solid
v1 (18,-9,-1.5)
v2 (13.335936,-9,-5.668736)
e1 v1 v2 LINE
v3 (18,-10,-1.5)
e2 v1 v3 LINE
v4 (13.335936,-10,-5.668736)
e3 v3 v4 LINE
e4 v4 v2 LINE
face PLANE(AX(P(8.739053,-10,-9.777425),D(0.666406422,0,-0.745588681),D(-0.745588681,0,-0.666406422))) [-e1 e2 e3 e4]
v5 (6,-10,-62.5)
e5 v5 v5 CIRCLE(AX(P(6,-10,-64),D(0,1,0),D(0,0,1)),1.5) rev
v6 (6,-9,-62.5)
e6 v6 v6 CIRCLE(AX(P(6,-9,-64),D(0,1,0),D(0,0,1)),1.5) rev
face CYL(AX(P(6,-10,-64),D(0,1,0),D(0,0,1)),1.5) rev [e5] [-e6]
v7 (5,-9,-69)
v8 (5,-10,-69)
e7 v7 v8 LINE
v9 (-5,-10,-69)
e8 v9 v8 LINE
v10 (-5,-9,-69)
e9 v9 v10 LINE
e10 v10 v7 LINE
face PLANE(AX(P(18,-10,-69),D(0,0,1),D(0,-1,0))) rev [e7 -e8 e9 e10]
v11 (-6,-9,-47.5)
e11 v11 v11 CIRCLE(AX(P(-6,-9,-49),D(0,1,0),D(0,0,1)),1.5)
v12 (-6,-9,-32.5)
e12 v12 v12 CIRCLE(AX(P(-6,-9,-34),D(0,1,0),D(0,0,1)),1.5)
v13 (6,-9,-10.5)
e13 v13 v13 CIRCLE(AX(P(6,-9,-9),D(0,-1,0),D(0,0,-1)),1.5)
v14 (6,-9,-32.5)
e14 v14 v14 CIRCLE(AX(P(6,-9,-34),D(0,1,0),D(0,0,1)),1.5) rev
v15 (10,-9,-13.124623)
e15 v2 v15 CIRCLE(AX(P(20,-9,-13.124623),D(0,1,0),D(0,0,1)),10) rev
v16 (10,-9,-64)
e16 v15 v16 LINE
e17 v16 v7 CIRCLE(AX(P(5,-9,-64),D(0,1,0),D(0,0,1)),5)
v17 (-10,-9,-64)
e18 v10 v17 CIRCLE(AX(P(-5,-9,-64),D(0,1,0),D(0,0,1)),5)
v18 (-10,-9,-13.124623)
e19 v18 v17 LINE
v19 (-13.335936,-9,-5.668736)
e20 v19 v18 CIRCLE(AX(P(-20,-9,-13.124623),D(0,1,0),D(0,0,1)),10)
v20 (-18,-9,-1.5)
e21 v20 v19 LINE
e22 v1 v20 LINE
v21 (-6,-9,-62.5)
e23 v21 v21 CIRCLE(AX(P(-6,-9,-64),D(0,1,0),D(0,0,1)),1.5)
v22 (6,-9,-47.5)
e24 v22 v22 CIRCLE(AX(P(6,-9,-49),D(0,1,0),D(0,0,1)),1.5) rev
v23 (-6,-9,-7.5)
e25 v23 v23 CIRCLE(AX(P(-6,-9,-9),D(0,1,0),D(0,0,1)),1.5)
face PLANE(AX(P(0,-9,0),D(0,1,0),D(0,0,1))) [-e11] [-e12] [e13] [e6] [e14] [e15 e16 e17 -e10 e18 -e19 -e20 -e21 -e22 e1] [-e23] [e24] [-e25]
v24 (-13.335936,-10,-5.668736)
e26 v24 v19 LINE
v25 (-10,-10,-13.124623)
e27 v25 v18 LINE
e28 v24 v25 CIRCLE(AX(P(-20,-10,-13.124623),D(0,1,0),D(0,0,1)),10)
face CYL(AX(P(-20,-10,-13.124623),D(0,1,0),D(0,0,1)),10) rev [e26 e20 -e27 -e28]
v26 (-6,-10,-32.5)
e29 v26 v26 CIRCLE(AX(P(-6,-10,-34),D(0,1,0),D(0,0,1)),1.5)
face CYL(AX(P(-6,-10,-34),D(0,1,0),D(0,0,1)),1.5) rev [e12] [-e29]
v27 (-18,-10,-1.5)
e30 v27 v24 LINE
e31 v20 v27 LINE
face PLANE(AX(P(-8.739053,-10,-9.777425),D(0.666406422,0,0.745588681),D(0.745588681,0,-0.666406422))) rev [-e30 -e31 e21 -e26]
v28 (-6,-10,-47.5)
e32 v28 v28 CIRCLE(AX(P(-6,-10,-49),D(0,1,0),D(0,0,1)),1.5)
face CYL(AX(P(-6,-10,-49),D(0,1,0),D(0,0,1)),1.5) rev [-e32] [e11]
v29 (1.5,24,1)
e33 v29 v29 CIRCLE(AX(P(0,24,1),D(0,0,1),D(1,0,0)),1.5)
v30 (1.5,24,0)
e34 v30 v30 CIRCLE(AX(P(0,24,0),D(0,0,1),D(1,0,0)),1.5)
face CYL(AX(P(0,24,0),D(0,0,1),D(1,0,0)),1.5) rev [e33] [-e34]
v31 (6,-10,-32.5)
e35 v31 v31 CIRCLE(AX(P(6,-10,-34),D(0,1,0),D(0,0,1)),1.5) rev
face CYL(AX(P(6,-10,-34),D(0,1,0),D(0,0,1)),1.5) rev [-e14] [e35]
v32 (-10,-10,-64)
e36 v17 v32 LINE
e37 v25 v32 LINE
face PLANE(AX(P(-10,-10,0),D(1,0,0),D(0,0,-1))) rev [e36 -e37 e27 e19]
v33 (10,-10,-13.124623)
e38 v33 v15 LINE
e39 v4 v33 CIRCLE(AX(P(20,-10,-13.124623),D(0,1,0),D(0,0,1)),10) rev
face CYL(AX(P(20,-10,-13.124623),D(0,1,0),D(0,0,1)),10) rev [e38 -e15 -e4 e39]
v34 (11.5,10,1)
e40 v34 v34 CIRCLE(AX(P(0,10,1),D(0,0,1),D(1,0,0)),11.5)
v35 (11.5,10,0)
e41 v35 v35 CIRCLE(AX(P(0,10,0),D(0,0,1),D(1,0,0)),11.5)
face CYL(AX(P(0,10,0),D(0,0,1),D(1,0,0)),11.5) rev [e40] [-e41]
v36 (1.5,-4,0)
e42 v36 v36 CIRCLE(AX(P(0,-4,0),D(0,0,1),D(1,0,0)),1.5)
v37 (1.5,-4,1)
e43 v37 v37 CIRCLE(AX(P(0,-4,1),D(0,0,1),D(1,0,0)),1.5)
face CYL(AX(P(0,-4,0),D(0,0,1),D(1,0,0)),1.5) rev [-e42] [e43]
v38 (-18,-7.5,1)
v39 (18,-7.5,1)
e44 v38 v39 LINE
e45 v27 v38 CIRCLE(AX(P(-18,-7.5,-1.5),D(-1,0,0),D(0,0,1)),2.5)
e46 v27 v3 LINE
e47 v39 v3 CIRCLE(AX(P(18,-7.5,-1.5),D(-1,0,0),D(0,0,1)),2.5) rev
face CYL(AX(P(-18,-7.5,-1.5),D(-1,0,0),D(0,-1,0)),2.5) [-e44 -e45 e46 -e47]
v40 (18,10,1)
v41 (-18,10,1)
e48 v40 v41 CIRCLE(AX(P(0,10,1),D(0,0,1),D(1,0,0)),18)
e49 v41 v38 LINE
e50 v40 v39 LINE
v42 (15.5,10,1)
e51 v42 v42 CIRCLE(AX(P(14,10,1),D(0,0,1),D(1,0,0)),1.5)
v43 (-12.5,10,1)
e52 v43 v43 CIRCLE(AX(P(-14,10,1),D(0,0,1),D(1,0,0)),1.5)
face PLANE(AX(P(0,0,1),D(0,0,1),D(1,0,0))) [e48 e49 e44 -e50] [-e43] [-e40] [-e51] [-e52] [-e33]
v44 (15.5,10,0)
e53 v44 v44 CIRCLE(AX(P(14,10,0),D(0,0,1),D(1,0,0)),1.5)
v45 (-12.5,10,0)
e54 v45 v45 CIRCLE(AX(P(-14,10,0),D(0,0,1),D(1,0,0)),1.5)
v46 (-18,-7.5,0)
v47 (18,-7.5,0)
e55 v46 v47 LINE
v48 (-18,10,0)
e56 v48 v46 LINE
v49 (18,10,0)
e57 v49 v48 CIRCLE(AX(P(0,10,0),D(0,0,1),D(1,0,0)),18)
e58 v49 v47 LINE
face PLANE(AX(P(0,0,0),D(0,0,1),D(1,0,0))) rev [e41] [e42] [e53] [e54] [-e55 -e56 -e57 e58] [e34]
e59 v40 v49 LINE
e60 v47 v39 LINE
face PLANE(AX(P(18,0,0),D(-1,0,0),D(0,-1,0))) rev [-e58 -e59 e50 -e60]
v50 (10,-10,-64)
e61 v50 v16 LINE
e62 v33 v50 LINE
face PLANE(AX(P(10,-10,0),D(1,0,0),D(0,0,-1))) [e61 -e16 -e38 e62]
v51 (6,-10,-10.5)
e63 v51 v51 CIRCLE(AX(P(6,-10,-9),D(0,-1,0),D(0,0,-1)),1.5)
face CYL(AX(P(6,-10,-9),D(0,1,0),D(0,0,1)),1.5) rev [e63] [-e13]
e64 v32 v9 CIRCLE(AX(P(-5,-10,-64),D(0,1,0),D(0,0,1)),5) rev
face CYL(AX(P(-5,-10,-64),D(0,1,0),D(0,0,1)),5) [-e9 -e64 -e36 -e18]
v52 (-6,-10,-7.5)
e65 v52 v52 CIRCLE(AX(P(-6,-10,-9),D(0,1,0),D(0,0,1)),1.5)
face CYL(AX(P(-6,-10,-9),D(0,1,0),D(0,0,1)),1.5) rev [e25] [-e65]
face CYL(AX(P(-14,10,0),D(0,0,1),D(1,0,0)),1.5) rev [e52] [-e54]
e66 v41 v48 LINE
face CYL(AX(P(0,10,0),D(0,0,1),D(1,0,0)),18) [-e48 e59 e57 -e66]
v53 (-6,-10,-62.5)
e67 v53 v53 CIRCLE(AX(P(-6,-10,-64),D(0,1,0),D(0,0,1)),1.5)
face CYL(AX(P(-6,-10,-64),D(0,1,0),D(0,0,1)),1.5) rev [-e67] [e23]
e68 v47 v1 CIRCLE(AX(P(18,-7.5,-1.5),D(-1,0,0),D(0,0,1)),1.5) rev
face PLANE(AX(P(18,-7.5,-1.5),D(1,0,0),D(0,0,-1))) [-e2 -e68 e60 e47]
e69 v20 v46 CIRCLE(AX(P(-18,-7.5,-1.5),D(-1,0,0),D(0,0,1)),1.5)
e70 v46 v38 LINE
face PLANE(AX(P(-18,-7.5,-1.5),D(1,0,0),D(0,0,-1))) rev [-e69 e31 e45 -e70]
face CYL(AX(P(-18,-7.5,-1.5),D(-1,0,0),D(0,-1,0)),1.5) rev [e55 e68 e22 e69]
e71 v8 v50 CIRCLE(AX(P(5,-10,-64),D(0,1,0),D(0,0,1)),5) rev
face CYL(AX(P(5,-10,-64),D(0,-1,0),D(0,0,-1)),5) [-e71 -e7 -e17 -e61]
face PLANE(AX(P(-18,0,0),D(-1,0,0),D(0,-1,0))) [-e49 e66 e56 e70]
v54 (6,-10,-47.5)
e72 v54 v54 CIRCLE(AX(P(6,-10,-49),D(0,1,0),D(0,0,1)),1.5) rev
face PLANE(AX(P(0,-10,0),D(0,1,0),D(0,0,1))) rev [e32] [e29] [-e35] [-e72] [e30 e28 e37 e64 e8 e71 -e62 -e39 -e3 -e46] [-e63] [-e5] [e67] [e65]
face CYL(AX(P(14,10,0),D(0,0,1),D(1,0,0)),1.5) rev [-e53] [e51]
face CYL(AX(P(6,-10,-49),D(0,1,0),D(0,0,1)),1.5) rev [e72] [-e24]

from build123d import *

# Parameters (mm, degrees)
BOSS_EXTRUDE1_DEPTH          = 1
EDGE_FLANGE1_STRIP_W         = 7
EDGE_FLANGE1_STRIP_H         = 1
EDGE_FLANGE1_STRIP_CUT_DEPTH = 36
EDGE_FLANGE1_DEPTH           = 36
SKETCH12_R                   = 1.5
CUT_EXTRUDE2_DEPTH           = 1
FILLET1_R                    = 5


# Sheet-metal steps are written as plain solids
with BuildPart() as part:
    # Sketch1 → Boss-Extrude1 (new body)
    with BuildSketch(Plane.XY):
        with BuildLine():
            Line((11.5, 10), (12.5, 10))
            ThreePointArc((12.5, 10), (12.911299923, 11.031858587), (13.919642857, 11.49784603))
            ThreePointArc((13.919642857, 11.49784603), (9.899494937, 19.899494937), (1.49784603, 23.919642857))
            ThreePointArc((1.49784603, 23.919642857), (0, 22.5), (-1.49784603, 23.919642857))
            ThreePointArc((-1.49784603, 23.919642857), (-9.899494937, 19.899494937), (-13.919642857, 11.49784603))
            ThreePointArc((-13.919642857, 11.49784603), (-12.911299923, 11.031858587), (-12.5, 10))
            Line((-12.5, 10), (-11.5, 10))
            ThreePointArc((-11.5, 10), (0, 21.5), (11.5, 10))
        make_face()
        with BuildLine():
            ThreePointArc((13.919642857, 11.49784603), (15.031858587, 11.088700077), (15.5, 10))
            Line((15.5, 10), (18, 10))
            ThreePointArc((18, 10), (0, 28), (-18, 10))
            Line((-18, 10), (-15.5, 10))
            ThreePointArc((-15.5, 10), (-15.031858587, 11.088700077), (-13.919642857, 11.49784603))
            ThreePointArc((-13.919642857, 11.49784603), (-9.899494937, 19.899494937), (-1.49784603, 23.919642857))
            ThreePointArc((-1.49784603, 23.919642857), (-0.040193003, 25.499461411), (1.5, 24))
            ThreePointArc((1.5, 24), (1.499461411, 23.959806997), (1.49784603, 23.919642857))
            ThreePointArc((1.49784603, 23.919642857), (9.899494937, 19.899494937), (13.919642857, 11.49784603))
        make_face()
        with BuildLine():
            ThreePointArc((13.919642857, 8.50215397), (12.911299923, 8.968141413), (12.5, 10))
            Line((12.5, 10), (11.5, 10))
            ThreePointArc((11.5, 10), (0, -1.5), (-11.5, 10))
            Line((-11.5, 10), (-12.5, 10))
            ThreePointArc((-12.5, 10), (-12.911299923, 8.968141413), (-13.919642857, 8.50215397))
            ThreePointArc((-13.919642857, 8.50215397), (-9.899494937, 0.100505063), (-1.49784603, -3.919642857))
            ThreePointArc((-1.49784603, -3.919642857), (0, -2.5), (1.49784603, -3.919642857))
            ThreePointArc((1.49784603, -3.919642857), (9.899494937, 0.100505063), (13.919642857, 8.50215397))
        make_face()
        with BuildLine():
            Line((18, 10), (15.5, 10))
            ThreePointArc((15.5, 10), (15.031858587, 8.911299923), (13.919642857, 8.50215397))
            ThreePointArc((13.919642857, 8.50215397), (9.899494937, 0.100505063), (1.49784603, -3.919642857))
            ThreePointArc((1.49784603, -3.919642857), (1.499461411, -3.959806997), (1.5, -4))
            ThreePointArc((1.5, -4), (-0.040193003, -5.499461411), (-1.49784603, -3.919642857))
            ThreePointArc((-1.49784603, -3.919642857), (-9.899494937, 0.100505063), (-13.919642857, 8.50215397))
            ThreePointArc((-13.919642857, 8.50215397), (-15.031858587, 8.911299923), (-15.5, 10))
            Line((-15.5, 10), (-18, 10))
            ThreePointArc((-18, 10), (0, -8), (18, 10))
        make_face()
        with BuildLine():
            Line((18, -10), (18, 10))
            ThreePointArc((18, 10), (0, -8), (-18, 10))
            Line((-18, 10), (-18, -10))
            Line((-18, -10), (18, -10))
        make_face()
    extrude(amount=BOSS_EXTRUDE1_DEPTH)

    # Edge-Flange1 strip (across the edge) → Edge-Flange1 strip cut (cut)
    with BuildSketch(Plane(origin=(18, -10, 0), x_dir=(0, 1, 0), z_dir=(-1, 0, 0))):
        with Locations((-1, -0.5)):
            Rectangle(EDGE_FLANGE1_STRIP_W, EDGE_FLANGE1_STRIP_H)
    extrude(amount=EDGE_FLANGE1_STRIP_CUT_DEPTH, mode=Mode.SUBTRACT)

    # Edge-Flange1 section (across the edge) → Edge-Flange1 (add)
    with BuildSketch(Plane(origin=(18, -10, 0), x_dir=(0, 1, 0), z_dir=(-1, 0, 0))):
        with BuildLine():
            Line((0, 1.5), (0, 69))
            Line((0, 69), (1, 69))
            Line((1, 69), (1, 1.5))
            ThreePointArc((1, 1.5), (1.439339828, 0.439339828), (2.5, 0))
            Line((2.5, 0), (2.5, -1))
            ThreePointArc((2.5, -1), (0.732233047, -0.267766953), (0, 1.5))
        make_face()
    extrude(amount=EDGE_FLANGE1_DEPTH)

    # Sketch12 → Cut-Extrude2 (cut)
    with BuildSketch(Plane(origin=(0, -9, 0), x_dir=(1, 0, 0), z_dir=(0, 1, 0))):
        with BuildLine():
            Line((-18, 69), (-18, 1.5))
            Line((-18, 1.5), (-13.335935783, 5.66873596))
            ThreePointArc((-13.335935783, 5.66873596), (-10.872003446, 9.040546507), (-10, 13.124622769))
            Line((-10, 13.124622769), (-10, 69))
            Line((-10, 69), (-18, 69))
        make_face()
        with BuildLine():
            Line((13.335935783, 5.66873596), (18, 1.5))
            Line((18, 1.5), (18, 69))
            Line((18, 69), (10, 69))
            Line((10, 69), (10, 13.124622769))
            ThreePointArc((10, 13.124622769), (10.872003446, 9.040546507), (13.335935783, 5.66873596))
        make_face()
        with Locations(Location((-6, 64, 0), (0, 0, 270))):
            Circle(SKETCH12_R)
        with Locations(Location((6, 64, 0), (0, 0, 270))):
            Circle(SKETCH12_R)
        with Locations(Location((-6, 49, 0), (0, 0, 270))):
            Circle(SKETCH12_R)
        with Locations(Location((6, 49, 0), (0, 0, 270))):
            Circle(SKETCH12_R)
        with Locations(Location((-6, 34, 0), (0, 0, 270))):
            Circle(SKETCH12_R)
        with Locations(Location((6, 34, 0), (0, 0, 270))):
            Circle(SKETCH12_R)
        with Locations(Location((-6, 9, 0), (0, 0, 270))):
            Circle(SKETCH12_R)
        with Locations(Location((6, 9, 0), (0, 0, 90))):
            Circle(SKETCH12_R)
    extrude(amount=-CUT_EXTRUDE2_DEPTH, mode=Mode.SUBTRACT)

    # Fillet1
    fillet1_edges = [part.edges().sort_by_distance(p)[0] for p in [
        (10, -9.5, -69),
        (-10, -9.5, -69),
    ]]
    fillet(fillet1_edges, radius=FILLET1_R)


solid = part.part
